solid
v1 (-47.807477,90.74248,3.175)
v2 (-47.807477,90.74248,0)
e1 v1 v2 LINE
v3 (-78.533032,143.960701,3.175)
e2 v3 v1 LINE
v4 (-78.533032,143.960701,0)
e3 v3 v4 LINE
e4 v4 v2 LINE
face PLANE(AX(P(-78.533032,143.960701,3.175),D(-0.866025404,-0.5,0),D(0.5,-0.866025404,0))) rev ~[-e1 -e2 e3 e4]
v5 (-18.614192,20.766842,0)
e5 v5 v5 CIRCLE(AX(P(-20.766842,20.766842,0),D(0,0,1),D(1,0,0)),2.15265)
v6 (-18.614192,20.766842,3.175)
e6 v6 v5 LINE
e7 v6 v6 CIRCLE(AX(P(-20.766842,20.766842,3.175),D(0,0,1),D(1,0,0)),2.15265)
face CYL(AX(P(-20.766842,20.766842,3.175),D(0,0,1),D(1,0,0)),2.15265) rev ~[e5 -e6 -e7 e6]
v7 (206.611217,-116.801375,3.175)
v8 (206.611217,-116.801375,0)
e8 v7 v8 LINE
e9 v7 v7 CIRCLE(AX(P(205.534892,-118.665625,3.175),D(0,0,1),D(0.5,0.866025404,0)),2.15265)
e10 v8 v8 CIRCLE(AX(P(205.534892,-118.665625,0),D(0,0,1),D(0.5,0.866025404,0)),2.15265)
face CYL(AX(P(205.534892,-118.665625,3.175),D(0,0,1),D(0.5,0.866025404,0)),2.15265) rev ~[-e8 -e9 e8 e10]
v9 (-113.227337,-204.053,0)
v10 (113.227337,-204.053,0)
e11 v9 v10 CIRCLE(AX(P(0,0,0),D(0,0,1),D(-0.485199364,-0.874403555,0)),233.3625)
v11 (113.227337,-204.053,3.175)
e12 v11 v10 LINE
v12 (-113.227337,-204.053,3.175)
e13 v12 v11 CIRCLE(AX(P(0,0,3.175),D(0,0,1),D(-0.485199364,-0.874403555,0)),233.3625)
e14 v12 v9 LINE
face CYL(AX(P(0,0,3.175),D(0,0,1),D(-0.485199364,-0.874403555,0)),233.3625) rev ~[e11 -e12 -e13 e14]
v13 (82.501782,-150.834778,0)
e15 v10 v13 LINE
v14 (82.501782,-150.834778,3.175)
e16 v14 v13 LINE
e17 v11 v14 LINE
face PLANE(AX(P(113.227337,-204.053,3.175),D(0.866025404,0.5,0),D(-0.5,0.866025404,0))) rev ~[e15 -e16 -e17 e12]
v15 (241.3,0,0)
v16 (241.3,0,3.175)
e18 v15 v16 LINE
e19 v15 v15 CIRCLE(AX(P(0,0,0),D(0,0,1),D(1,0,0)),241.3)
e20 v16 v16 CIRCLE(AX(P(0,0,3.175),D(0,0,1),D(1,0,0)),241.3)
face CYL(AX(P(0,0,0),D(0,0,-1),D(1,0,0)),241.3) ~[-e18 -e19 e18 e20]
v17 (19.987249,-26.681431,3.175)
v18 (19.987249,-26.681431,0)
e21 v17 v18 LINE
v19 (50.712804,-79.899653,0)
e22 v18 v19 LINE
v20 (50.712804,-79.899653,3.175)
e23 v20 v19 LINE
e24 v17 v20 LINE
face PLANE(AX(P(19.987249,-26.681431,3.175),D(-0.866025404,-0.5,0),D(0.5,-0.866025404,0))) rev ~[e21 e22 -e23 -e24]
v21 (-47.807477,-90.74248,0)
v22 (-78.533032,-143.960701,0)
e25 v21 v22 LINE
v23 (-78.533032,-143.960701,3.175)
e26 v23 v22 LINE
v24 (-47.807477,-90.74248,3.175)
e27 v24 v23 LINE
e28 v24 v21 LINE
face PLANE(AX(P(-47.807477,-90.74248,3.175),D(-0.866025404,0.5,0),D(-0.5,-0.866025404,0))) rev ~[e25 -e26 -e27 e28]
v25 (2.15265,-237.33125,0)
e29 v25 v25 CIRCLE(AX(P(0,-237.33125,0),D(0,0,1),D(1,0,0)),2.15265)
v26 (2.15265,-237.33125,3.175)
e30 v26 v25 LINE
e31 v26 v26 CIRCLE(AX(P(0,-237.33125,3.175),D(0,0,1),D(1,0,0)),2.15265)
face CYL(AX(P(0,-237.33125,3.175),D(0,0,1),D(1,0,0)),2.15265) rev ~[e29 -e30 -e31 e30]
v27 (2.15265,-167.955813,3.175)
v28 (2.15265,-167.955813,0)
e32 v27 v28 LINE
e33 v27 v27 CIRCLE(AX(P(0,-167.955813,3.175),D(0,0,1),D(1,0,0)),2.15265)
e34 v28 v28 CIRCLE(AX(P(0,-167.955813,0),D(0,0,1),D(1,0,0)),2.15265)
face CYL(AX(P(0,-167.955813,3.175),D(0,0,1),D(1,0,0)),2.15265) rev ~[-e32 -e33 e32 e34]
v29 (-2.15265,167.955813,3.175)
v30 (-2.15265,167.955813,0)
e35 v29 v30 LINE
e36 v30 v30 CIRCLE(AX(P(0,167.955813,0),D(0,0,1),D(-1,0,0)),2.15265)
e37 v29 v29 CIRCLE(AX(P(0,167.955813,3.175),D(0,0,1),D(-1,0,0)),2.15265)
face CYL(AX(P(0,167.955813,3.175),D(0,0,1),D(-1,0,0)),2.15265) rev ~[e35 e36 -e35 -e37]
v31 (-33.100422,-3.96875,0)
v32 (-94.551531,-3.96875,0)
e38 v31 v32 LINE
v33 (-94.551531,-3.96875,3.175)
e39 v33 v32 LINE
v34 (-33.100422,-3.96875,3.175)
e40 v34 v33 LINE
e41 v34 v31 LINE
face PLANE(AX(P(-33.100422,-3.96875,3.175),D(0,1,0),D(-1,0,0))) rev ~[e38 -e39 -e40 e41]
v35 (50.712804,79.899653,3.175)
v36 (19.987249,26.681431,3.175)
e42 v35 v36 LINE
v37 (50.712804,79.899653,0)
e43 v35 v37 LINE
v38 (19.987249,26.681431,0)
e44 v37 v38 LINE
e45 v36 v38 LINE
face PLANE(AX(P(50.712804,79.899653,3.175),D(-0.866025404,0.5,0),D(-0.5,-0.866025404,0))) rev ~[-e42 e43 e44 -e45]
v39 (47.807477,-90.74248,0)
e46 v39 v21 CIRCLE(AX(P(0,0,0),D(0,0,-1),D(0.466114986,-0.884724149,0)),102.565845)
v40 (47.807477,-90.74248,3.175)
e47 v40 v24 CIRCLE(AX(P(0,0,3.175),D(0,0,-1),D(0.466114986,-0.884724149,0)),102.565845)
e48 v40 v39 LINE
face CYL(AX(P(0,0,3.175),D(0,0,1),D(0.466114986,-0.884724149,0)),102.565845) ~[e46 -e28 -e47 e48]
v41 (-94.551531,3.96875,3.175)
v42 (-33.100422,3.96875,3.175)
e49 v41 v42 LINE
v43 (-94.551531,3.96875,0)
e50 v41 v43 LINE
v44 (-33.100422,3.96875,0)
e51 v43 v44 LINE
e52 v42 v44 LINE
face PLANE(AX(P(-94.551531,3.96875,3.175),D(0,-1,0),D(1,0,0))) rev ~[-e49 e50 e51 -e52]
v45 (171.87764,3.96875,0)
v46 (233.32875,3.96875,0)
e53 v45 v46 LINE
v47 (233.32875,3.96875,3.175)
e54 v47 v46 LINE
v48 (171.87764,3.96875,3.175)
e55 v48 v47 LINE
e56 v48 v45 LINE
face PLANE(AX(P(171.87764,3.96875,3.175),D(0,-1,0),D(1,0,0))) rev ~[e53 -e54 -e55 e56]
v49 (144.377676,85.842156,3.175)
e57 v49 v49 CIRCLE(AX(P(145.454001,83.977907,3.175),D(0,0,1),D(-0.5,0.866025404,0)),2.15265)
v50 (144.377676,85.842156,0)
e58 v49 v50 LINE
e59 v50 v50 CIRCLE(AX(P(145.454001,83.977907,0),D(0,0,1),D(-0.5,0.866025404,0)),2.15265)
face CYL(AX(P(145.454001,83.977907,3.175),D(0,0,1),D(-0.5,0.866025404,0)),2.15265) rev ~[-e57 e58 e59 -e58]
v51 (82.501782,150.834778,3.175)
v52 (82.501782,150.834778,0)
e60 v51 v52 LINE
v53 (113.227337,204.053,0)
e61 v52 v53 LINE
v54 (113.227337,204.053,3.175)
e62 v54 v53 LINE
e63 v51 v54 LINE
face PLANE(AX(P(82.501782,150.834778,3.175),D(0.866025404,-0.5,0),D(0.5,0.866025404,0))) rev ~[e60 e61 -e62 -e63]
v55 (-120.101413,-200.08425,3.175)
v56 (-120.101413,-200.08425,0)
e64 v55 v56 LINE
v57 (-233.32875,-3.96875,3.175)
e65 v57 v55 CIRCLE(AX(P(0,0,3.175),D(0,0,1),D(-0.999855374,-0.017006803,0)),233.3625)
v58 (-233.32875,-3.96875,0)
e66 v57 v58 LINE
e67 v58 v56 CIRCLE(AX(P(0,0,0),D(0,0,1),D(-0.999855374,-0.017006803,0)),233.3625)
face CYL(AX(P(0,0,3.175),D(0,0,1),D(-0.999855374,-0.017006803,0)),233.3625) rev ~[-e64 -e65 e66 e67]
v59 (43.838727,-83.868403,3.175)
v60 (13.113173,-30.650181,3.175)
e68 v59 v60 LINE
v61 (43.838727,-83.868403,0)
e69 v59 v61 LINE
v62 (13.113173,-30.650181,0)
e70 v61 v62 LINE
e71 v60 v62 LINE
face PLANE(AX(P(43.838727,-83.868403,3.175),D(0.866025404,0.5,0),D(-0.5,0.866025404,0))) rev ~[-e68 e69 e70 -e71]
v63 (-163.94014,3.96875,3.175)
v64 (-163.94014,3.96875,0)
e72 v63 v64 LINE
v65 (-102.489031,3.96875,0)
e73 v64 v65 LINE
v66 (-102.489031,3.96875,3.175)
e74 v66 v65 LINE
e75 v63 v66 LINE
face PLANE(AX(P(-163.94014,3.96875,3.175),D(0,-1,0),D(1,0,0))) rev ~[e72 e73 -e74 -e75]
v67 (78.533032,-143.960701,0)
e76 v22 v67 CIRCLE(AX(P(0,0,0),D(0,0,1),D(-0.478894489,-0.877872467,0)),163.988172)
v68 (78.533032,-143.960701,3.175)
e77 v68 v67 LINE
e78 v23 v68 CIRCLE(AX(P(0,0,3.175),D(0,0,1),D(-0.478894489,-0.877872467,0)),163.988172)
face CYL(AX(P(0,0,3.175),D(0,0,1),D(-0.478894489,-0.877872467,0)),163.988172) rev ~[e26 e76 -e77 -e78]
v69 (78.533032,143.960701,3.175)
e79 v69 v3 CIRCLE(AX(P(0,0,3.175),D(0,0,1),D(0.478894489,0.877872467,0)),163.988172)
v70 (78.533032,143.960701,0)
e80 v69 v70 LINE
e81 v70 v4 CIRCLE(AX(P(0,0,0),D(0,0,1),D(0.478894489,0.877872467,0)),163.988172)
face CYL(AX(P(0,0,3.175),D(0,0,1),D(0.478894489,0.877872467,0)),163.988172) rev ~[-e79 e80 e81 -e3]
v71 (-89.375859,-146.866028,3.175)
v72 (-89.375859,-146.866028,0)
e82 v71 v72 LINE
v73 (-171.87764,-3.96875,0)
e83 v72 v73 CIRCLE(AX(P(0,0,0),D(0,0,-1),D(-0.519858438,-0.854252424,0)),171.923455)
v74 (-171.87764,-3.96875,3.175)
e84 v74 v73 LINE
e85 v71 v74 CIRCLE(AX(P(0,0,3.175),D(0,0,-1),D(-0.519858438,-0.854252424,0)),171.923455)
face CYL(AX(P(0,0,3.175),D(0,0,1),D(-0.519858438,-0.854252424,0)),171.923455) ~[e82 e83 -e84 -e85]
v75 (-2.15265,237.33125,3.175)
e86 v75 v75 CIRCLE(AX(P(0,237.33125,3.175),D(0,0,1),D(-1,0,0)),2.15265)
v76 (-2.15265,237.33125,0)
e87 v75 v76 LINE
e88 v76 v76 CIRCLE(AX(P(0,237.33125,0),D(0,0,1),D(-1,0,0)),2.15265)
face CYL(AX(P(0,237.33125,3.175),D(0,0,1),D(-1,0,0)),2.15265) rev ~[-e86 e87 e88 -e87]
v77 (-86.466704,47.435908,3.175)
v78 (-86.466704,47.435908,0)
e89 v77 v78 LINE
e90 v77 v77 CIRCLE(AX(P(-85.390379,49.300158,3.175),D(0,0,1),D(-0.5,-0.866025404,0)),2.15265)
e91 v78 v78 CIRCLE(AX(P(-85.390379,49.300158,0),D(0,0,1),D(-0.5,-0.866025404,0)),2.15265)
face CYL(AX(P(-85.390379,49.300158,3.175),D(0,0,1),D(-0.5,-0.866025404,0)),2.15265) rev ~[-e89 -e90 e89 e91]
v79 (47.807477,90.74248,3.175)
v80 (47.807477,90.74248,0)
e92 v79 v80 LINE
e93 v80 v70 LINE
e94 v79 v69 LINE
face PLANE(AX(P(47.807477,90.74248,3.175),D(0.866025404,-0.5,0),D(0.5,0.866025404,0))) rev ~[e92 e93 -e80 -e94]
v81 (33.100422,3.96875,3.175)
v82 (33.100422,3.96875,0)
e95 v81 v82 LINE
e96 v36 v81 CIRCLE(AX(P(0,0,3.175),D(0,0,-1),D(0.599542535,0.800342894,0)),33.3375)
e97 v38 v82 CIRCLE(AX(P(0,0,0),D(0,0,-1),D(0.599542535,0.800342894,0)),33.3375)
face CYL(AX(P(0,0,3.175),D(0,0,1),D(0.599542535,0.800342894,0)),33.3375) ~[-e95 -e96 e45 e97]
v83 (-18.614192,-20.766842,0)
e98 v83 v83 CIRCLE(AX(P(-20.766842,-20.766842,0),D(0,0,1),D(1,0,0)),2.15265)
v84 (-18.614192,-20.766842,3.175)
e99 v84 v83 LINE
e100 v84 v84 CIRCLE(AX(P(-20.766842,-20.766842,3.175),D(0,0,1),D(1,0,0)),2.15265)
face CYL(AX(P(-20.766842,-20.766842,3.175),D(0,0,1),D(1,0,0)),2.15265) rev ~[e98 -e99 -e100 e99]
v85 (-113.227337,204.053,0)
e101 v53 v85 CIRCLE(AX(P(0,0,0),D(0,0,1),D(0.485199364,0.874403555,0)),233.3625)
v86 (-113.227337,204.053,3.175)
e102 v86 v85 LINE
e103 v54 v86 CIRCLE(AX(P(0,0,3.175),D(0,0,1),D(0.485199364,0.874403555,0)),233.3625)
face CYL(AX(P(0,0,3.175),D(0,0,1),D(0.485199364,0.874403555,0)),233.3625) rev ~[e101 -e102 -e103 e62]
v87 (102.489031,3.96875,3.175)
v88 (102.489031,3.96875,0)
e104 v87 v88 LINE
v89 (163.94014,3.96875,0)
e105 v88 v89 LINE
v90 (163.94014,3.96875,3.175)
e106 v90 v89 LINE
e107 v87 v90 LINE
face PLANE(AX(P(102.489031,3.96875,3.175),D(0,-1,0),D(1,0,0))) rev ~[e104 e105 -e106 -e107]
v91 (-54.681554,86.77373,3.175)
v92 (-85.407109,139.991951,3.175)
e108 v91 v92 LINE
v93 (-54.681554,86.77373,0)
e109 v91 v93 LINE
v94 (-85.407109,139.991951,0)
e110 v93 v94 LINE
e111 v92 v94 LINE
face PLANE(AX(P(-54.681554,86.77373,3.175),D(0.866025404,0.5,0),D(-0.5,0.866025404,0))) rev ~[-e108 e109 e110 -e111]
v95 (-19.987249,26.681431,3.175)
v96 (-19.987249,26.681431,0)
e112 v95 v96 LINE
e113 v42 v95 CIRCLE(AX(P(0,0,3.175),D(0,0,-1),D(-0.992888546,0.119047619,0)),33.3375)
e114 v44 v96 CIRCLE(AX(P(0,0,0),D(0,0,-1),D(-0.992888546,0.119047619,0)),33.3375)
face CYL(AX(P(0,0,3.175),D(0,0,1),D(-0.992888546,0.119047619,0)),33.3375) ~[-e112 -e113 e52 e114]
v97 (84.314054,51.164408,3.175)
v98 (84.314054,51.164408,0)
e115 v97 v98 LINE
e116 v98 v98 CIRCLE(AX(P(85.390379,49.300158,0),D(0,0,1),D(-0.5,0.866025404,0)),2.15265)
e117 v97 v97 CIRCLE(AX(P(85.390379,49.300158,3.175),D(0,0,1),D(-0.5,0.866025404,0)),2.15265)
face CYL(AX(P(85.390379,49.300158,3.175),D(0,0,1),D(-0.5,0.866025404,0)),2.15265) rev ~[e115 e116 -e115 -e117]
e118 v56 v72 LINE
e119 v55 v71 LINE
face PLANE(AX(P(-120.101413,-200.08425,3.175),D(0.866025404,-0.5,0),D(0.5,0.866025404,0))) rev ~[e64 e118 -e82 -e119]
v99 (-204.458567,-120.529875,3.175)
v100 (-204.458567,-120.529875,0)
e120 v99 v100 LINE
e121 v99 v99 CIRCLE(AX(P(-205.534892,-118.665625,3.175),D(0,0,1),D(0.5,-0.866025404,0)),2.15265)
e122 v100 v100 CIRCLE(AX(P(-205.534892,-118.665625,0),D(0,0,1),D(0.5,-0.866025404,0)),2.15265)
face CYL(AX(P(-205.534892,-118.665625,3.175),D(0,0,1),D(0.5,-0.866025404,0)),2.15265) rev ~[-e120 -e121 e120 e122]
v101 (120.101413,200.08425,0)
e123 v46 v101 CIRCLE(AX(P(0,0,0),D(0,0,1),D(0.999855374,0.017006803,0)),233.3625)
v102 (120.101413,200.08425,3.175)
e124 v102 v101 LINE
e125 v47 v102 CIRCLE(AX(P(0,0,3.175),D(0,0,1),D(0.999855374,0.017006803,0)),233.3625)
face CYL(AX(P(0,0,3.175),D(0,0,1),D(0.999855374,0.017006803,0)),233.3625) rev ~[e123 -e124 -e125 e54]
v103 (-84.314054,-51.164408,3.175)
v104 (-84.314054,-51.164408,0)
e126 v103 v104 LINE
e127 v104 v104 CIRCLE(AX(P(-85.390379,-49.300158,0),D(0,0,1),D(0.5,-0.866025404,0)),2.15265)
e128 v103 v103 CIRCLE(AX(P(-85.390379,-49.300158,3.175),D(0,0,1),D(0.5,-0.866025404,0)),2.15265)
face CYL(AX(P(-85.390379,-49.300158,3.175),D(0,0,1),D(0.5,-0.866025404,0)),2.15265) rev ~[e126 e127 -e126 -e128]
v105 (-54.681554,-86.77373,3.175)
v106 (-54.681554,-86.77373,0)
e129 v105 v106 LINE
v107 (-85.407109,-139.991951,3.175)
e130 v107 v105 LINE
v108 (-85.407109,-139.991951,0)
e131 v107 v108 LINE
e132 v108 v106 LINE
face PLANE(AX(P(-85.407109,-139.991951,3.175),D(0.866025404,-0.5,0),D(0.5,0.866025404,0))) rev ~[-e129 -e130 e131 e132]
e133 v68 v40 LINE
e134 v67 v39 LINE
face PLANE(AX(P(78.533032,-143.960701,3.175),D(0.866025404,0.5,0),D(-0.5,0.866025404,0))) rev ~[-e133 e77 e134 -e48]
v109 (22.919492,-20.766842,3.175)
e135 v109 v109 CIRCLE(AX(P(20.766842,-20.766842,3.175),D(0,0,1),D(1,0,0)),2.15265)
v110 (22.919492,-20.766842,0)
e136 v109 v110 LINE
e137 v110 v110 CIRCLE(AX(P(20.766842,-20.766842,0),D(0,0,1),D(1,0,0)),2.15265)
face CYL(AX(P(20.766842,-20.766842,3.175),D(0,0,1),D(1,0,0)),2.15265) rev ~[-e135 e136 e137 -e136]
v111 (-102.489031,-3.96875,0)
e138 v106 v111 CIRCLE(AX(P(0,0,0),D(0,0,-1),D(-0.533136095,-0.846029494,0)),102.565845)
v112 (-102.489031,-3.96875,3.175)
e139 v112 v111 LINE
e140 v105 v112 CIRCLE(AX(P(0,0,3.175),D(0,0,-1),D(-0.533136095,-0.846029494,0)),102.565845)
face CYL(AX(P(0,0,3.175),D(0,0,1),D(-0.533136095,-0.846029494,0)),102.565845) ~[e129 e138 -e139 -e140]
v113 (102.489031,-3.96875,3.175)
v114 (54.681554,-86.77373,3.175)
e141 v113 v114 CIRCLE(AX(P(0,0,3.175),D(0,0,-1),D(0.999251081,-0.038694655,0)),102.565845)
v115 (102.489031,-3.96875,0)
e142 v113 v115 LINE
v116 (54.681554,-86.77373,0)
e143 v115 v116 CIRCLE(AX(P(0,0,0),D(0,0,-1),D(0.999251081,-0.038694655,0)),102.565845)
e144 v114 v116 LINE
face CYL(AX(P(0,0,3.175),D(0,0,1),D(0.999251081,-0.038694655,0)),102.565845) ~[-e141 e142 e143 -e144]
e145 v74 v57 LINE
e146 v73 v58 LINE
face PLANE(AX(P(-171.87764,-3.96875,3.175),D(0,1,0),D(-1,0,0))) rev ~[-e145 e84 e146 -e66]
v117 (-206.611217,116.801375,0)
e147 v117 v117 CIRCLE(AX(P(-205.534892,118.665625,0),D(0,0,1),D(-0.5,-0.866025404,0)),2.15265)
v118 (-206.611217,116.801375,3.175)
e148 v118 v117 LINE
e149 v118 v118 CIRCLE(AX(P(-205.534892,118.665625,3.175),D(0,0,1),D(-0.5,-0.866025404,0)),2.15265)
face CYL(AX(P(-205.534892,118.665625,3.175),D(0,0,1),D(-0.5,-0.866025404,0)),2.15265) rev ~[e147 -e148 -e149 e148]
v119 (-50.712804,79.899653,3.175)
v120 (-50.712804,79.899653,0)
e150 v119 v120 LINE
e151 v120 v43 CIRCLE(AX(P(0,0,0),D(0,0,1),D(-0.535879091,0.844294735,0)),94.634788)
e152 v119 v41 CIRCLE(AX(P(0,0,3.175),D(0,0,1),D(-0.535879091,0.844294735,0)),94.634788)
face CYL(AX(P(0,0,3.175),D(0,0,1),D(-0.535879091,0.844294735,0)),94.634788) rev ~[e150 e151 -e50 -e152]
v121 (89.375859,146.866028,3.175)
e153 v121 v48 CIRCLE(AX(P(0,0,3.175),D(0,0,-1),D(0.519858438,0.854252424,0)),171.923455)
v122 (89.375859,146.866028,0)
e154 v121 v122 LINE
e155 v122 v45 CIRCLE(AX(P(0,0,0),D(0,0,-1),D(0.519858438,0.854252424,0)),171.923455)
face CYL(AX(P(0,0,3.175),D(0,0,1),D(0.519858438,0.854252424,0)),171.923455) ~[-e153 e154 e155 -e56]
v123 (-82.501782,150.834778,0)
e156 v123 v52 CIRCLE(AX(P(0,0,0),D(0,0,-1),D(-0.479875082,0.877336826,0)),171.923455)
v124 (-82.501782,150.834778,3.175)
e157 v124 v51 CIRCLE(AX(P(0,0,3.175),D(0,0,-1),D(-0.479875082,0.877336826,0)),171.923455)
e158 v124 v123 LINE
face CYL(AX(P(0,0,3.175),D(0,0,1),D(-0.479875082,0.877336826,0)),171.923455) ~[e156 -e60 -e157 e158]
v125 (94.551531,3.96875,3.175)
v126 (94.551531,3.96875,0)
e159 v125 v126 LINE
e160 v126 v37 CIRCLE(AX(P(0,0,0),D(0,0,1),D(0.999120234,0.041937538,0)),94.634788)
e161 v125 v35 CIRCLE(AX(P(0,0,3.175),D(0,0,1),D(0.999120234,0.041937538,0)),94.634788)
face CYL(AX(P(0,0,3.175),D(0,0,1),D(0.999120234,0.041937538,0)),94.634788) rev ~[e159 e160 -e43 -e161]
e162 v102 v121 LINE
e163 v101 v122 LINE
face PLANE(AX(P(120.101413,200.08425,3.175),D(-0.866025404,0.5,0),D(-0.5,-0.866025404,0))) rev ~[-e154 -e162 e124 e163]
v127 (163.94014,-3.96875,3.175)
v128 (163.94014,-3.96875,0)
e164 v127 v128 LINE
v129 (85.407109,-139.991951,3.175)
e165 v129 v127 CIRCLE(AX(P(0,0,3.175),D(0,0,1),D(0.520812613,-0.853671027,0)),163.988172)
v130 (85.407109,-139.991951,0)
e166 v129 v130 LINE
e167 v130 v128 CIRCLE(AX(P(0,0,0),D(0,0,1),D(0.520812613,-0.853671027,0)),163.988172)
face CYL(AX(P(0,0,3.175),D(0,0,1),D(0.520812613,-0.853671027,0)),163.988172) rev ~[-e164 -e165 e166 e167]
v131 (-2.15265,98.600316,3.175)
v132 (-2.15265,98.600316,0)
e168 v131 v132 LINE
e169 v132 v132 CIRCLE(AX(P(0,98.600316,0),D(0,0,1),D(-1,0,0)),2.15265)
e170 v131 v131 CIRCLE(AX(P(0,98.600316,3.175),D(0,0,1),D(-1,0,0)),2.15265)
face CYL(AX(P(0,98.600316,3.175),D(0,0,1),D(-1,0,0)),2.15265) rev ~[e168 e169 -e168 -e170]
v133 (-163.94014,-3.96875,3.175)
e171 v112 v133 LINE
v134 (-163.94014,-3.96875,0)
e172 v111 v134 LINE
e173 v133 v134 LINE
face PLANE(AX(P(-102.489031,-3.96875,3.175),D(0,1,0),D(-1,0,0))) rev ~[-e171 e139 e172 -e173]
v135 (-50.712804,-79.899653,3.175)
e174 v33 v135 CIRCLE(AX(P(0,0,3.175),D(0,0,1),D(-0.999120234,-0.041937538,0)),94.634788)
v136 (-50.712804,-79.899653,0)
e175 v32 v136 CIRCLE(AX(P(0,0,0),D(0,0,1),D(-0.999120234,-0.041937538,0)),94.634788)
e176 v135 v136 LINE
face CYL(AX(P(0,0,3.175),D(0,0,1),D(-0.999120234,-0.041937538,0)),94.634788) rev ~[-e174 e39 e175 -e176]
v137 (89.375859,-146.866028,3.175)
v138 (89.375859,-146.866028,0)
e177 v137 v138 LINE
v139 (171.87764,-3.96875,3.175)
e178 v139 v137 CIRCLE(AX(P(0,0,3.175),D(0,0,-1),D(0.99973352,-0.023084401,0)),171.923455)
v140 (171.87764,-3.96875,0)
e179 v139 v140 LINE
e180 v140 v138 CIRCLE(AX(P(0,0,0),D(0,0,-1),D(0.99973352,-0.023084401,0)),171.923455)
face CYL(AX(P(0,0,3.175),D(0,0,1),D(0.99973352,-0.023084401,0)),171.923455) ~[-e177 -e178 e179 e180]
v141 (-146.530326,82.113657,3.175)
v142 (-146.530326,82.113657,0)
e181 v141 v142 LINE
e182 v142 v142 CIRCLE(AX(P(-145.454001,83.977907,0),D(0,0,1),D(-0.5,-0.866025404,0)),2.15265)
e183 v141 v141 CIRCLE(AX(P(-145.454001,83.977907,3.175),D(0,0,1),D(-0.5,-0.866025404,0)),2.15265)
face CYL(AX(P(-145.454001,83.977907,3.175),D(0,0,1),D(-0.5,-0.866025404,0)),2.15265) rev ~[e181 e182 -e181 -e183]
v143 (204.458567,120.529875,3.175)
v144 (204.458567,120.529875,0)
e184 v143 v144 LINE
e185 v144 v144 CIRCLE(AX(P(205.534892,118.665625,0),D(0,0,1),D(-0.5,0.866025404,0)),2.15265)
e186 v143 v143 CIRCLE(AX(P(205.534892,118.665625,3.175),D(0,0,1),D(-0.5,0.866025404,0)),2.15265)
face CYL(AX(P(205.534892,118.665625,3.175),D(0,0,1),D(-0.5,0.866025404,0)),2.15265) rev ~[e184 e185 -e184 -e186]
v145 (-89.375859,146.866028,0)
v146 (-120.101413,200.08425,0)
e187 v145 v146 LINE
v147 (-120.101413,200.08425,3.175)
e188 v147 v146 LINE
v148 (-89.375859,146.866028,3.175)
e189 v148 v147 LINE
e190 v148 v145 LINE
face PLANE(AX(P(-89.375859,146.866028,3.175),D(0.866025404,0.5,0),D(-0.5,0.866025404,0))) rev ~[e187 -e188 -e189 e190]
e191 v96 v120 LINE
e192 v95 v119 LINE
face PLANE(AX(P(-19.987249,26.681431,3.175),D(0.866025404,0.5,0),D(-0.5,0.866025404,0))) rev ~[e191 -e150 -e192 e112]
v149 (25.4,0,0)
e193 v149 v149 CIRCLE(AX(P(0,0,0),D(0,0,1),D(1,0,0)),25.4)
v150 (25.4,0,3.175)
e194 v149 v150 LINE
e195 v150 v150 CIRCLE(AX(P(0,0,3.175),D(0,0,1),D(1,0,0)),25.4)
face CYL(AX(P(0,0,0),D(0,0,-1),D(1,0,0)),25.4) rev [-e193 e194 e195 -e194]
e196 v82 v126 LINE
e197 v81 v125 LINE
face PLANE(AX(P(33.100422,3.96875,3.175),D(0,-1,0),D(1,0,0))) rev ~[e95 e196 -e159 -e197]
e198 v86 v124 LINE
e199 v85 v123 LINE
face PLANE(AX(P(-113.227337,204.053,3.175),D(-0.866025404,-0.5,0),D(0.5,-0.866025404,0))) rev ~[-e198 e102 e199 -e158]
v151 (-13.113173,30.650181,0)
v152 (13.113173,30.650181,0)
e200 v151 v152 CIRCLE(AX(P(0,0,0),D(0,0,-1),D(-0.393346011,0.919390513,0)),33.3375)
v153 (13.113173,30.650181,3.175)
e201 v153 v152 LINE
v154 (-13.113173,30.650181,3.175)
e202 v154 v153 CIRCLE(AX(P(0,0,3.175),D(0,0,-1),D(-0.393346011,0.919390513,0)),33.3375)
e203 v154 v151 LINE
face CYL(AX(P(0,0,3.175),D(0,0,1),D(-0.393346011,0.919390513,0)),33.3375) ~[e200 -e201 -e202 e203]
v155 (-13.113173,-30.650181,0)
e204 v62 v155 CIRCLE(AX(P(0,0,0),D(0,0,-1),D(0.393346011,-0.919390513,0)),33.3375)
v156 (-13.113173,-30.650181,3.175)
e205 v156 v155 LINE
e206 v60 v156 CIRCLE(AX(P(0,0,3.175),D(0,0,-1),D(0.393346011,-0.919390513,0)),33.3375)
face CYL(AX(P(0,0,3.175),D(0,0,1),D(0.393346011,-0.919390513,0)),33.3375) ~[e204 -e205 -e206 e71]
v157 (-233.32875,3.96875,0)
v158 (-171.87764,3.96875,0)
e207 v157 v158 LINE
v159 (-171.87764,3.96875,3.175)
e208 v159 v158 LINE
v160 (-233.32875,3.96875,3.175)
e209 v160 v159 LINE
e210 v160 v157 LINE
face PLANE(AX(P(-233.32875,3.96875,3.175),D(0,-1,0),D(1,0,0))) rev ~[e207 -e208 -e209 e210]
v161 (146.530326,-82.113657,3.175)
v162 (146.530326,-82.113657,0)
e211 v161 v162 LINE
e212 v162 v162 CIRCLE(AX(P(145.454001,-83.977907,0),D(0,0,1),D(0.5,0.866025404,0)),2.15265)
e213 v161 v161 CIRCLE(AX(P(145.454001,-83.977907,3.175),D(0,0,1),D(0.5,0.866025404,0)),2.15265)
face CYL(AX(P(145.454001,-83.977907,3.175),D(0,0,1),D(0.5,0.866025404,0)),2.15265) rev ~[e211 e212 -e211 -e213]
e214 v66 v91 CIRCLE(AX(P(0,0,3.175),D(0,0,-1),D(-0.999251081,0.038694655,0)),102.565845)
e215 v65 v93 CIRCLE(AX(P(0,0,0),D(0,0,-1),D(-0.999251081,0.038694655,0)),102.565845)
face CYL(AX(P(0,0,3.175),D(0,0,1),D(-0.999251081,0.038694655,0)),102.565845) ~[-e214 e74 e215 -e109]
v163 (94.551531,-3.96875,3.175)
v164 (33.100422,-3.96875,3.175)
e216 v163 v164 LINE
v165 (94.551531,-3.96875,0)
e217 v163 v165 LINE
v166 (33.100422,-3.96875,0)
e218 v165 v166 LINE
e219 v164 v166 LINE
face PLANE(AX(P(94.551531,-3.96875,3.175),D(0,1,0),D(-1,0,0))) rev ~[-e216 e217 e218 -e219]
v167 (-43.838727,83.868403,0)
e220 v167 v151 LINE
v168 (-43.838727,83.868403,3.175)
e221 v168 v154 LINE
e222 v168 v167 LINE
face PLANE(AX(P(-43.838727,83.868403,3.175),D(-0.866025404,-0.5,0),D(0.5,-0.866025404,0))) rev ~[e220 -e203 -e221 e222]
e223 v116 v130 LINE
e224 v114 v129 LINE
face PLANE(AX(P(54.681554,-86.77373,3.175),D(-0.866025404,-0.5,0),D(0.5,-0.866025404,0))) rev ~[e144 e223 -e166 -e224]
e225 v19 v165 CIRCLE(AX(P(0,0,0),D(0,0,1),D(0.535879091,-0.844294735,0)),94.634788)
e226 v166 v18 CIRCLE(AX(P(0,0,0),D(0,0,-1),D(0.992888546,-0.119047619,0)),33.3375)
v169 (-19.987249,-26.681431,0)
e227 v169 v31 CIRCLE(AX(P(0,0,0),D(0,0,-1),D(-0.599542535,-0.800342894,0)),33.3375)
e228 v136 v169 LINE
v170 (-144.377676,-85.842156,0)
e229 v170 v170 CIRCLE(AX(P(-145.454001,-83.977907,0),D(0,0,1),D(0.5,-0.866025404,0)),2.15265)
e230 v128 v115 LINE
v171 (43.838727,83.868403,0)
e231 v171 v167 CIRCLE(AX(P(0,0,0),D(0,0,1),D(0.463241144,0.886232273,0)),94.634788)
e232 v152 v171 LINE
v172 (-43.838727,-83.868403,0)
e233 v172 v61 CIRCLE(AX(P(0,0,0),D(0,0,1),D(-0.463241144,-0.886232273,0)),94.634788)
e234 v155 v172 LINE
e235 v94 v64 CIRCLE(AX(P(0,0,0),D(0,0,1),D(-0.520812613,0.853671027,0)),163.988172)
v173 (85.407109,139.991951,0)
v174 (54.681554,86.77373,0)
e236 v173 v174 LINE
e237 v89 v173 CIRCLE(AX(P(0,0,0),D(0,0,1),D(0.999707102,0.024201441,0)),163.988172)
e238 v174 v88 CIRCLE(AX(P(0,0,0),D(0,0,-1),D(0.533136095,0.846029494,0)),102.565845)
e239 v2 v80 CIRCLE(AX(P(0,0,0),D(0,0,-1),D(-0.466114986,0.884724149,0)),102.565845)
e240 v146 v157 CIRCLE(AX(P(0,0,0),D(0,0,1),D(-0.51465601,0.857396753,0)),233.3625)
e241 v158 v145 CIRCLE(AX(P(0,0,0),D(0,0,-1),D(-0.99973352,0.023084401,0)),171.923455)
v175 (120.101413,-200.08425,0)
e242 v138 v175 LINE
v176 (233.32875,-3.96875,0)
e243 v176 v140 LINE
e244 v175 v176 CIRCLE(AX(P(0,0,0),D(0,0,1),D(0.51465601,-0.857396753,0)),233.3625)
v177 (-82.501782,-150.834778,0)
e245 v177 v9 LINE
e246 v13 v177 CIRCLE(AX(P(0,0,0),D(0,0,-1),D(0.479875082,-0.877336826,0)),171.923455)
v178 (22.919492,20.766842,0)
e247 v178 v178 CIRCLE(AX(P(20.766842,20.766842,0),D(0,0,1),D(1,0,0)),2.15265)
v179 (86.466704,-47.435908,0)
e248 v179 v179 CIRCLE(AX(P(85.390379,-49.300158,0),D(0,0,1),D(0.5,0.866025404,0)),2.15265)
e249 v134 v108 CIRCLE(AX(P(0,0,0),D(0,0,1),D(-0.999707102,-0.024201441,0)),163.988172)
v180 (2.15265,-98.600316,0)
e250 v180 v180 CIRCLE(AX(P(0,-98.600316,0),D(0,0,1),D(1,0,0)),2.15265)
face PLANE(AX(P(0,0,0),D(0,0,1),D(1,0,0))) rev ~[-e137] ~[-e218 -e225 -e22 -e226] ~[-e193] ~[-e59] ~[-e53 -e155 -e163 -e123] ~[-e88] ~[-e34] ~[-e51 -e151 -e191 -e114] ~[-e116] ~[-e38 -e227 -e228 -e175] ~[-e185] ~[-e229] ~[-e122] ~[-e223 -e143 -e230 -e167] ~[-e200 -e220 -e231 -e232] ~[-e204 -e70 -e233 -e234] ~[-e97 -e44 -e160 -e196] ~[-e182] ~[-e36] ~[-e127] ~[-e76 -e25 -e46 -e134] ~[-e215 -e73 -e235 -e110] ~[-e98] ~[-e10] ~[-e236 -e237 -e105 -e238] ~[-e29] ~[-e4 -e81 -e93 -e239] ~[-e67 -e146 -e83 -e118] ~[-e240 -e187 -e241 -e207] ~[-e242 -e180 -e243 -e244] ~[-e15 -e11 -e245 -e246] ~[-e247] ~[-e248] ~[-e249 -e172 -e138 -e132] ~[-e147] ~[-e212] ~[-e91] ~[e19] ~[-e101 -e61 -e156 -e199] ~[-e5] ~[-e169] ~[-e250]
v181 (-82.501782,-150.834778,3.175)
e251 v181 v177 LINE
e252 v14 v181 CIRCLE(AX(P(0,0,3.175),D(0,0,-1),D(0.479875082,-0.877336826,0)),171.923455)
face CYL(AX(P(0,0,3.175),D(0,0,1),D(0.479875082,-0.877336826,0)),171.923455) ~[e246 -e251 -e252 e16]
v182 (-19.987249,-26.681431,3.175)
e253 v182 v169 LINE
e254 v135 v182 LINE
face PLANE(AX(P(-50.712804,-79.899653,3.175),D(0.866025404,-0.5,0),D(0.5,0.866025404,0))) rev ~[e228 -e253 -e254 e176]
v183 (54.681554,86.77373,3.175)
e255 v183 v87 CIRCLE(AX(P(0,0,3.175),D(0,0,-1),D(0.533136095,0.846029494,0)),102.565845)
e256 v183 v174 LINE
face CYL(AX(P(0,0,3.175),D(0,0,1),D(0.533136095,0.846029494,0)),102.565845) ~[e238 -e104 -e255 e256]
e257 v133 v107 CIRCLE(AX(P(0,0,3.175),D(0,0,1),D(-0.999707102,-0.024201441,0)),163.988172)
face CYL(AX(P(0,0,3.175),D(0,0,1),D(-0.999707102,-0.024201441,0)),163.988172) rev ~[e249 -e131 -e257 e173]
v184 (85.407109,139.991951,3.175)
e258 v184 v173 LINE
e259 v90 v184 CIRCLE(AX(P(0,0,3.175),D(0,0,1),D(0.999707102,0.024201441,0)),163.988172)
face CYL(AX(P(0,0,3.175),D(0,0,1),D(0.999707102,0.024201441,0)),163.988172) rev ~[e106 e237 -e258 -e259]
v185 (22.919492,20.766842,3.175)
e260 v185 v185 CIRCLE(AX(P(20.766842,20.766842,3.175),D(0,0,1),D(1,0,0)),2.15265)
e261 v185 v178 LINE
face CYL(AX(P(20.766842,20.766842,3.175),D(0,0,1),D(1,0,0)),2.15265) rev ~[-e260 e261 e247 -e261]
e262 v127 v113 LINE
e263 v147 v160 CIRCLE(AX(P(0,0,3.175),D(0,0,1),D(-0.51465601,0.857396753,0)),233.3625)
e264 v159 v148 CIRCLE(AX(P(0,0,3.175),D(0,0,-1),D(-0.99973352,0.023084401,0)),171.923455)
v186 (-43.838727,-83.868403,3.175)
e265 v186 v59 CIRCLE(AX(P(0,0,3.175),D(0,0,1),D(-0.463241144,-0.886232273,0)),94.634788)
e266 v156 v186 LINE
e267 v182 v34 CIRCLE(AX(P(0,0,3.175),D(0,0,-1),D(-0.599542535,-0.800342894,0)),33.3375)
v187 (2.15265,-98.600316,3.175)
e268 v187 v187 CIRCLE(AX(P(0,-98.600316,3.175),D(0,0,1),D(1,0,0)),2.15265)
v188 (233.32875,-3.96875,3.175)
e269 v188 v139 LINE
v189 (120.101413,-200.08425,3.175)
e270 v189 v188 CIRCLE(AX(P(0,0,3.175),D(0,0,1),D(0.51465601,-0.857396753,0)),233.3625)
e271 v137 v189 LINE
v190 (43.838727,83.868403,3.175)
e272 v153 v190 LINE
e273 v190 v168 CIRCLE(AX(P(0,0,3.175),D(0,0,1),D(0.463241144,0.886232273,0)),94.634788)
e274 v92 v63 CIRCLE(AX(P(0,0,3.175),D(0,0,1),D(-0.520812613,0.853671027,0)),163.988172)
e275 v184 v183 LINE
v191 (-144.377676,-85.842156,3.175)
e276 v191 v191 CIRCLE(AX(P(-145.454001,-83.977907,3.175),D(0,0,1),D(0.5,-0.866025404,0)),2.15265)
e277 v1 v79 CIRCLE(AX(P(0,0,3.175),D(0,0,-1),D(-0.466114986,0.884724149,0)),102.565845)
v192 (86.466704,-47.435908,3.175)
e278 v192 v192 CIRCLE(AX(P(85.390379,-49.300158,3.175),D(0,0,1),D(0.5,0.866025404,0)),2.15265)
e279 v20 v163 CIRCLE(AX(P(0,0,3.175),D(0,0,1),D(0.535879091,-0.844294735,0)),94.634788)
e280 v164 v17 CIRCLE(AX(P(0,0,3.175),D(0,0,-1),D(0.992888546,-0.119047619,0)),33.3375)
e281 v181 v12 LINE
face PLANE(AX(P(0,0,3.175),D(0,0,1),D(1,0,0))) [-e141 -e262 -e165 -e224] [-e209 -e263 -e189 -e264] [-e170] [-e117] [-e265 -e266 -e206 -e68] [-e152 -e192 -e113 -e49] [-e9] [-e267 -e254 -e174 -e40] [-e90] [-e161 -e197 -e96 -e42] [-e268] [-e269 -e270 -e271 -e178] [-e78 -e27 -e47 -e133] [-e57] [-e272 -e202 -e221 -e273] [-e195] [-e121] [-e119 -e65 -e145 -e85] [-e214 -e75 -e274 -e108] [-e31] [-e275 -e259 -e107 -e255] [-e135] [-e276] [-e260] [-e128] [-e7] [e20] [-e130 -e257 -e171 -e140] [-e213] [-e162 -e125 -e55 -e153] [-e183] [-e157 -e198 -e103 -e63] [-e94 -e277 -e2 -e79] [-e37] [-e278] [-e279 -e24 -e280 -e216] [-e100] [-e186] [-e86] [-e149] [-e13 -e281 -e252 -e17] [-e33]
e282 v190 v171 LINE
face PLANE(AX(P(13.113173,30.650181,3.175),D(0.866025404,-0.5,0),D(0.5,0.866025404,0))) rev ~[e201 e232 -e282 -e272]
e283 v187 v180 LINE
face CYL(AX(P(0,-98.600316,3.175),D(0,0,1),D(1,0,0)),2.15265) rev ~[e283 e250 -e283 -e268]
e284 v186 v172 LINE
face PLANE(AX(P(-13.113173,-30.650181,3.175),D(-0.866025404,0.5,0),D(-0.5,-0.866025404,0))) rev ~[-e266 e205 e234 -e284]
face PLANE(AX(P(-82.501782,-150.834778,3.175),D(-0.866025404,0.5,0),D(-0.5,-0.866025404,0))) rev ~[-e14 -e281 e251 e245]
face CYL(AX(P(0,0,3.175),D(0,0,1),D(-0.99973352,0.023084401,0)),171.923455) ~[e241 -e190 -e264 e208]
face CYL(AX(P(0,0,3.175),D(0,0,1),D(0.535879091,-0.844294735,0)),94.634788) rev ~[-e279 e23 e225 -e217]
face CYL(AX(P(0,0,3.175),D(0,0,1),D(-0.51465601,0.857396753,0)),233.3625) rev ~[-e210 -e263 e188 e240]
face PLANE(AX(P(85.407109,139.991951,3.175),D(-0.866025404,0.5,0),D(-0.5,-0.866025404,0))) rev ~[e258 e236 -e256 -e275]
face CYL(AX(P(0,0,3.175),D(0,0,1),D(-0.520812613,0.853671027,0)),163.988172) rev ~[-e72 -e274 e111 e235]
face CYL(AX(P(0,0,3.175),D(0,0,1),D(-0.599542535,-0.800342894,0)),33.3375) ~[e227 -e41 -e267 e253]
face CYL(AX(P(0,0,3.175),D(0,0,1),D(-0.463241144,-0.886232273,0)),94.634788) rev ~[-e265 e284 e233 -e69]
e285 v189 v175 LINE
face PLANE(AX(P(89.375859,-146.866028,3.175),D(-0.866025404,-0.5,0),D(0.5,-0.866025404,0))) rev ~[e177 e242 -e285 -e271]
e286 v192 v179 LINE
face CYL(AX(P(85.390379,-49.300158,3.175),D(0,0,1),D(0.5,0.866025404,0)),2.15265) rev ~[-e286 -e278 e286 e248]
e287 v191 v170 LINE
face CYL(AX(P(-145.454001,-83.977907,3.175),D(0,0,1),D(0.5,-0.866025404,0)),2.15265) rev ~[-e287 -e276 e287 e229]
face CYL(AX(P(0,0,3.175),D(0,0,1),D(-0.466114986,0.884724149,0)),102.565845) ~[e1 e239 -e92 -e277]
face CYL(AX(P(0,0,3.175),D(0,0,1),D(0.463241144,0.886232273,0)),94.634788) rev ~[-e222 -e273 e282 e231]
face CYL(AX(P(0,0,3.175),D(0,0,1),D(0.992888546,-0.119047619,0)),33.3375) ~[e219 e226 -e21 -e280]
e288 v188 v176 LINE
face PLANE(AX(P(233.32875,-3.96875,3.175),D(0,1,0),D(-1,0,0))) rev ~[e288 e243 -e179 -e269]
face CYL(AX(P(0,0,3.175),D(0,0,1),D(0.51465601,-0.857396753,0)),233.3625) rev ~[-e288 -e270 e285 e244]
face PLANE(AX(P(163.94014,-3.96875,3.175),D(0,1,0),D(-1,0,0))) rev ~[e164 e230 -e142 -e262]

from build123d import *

# Parameters (mm, degrees)
F0_R            = 241.3
F0_R_2          = 25.4
F1_DEPTH        = 3.175
F2_R            = 2.15265
F3_DEPTH        = 3.175
F3_COPIES_COUNT = 6
F4_R            = 2.15265
F5_DEPTH        = 3.175


# Not quite as in the source:
# - a pattern or mirror of a feature is missing from the dataset's text; its kind, count and spacing are read off the source's solid


with BuildPart() as f1:
    # F0 (on Top) → F1 (new body)
    with BuildSketch(Plane.XY):
        Circle(F0_R)
        Circle(F0_R_2, mode=Mode.SUBTRACT)
    extrude(amount=F1_DEPTH)

    # F2 (on face) → F3 (cut, through all)
    with BuildSketch(Plane.XY.offset(3.175)):
        with BuildLine():
            ThreePointArc((13.1131726267, -30.6501812378), (0, -33.3375), (-13.1131726267, -30.6501812378))
            Line((-13.1131726267, -30.6501812378), (-43.8387272582, -83.8684029504))
            ThreePointArc((-43.8387272582, -83.8684029504), (0, -94.6347875841), (43.8387272582, -83.8684029504))
            Line((43.8387272582, -83.8684029504), (13.1131726267, -30.6501812378))
        make_face()
        with BuildLine():
            Line((-82.5017818898, -150.8347779481), (-113.2273365214, -204.0529996607))
            ThreePointArc((-113.2273365214, -204.0529996607), (0, -233.3625), (113.2273365214, -204.0529996607))
            Line((113.2273365214, -204.0529996607), (82.5017818898, -150.8347779481))
            ThreePointArc((82.5017818898, -150.8347779481), (0, -171.923454635), (-82.5017818898, -150.8347779481))
        make_face()
        with BuildLine():
            ThreePointArc((47.8074772582, -90.742479593), (0, -102.5658446291), (-47.8074772582, -90.742479593))
            Line((-47.8074772582, -90.742479593), (-78.5330318898, -143.9607013056))
            ThreePointArc((-78.5330318898, -143.9607013056), (0, -163.9881721899), (78.5330318898, -143.9607013056))
            Line((78.5330318898, -143.9607013056), (47.8074772582, -90.742479593))
        make_face()
        with Locations((0, -98.6003161066)):
            Circle(F2_R)
        with Locations((0, -167.9558134125)):
            Circle(F2_R)
        with Locations((0, -237.33125)):
            Circle(F2_R)
    f3 = extrude(amount=-F3_DEPTH, mode=Mode.SUBTRACT)

    # F3_copies: F3 ×6 about axis
    f3_copies_axis = Axis((0, 0, 0), (0, 0, 1))
    for i in range(1, F3_COPIES_COUNT):
        add(f3.rotate(f3_copies_axis, i * 360 / F3_COPIES_COUNT), mode=Mode.SUBTRACT)

    # F4 (on face) → F5 (cut, through all)
    with BuildSketch(Plane.XY.offset(3.175)):
        with Locations((-20.76684228, 20.76684228)):
            Circle(F4_R)
        with Locations((20.76684228, 20.76684228)):
            Circle(F4_R)
        with Locations((20.76684228, -20.76684228)):
            Circle(F4_R)
        with Locations((-20.76684228, -20.76684228)):
            Circle(F4_R)
    extrude(amount=-F5_DEPTH, mode=Mode.SUBTRACT)


solid = f1.part
